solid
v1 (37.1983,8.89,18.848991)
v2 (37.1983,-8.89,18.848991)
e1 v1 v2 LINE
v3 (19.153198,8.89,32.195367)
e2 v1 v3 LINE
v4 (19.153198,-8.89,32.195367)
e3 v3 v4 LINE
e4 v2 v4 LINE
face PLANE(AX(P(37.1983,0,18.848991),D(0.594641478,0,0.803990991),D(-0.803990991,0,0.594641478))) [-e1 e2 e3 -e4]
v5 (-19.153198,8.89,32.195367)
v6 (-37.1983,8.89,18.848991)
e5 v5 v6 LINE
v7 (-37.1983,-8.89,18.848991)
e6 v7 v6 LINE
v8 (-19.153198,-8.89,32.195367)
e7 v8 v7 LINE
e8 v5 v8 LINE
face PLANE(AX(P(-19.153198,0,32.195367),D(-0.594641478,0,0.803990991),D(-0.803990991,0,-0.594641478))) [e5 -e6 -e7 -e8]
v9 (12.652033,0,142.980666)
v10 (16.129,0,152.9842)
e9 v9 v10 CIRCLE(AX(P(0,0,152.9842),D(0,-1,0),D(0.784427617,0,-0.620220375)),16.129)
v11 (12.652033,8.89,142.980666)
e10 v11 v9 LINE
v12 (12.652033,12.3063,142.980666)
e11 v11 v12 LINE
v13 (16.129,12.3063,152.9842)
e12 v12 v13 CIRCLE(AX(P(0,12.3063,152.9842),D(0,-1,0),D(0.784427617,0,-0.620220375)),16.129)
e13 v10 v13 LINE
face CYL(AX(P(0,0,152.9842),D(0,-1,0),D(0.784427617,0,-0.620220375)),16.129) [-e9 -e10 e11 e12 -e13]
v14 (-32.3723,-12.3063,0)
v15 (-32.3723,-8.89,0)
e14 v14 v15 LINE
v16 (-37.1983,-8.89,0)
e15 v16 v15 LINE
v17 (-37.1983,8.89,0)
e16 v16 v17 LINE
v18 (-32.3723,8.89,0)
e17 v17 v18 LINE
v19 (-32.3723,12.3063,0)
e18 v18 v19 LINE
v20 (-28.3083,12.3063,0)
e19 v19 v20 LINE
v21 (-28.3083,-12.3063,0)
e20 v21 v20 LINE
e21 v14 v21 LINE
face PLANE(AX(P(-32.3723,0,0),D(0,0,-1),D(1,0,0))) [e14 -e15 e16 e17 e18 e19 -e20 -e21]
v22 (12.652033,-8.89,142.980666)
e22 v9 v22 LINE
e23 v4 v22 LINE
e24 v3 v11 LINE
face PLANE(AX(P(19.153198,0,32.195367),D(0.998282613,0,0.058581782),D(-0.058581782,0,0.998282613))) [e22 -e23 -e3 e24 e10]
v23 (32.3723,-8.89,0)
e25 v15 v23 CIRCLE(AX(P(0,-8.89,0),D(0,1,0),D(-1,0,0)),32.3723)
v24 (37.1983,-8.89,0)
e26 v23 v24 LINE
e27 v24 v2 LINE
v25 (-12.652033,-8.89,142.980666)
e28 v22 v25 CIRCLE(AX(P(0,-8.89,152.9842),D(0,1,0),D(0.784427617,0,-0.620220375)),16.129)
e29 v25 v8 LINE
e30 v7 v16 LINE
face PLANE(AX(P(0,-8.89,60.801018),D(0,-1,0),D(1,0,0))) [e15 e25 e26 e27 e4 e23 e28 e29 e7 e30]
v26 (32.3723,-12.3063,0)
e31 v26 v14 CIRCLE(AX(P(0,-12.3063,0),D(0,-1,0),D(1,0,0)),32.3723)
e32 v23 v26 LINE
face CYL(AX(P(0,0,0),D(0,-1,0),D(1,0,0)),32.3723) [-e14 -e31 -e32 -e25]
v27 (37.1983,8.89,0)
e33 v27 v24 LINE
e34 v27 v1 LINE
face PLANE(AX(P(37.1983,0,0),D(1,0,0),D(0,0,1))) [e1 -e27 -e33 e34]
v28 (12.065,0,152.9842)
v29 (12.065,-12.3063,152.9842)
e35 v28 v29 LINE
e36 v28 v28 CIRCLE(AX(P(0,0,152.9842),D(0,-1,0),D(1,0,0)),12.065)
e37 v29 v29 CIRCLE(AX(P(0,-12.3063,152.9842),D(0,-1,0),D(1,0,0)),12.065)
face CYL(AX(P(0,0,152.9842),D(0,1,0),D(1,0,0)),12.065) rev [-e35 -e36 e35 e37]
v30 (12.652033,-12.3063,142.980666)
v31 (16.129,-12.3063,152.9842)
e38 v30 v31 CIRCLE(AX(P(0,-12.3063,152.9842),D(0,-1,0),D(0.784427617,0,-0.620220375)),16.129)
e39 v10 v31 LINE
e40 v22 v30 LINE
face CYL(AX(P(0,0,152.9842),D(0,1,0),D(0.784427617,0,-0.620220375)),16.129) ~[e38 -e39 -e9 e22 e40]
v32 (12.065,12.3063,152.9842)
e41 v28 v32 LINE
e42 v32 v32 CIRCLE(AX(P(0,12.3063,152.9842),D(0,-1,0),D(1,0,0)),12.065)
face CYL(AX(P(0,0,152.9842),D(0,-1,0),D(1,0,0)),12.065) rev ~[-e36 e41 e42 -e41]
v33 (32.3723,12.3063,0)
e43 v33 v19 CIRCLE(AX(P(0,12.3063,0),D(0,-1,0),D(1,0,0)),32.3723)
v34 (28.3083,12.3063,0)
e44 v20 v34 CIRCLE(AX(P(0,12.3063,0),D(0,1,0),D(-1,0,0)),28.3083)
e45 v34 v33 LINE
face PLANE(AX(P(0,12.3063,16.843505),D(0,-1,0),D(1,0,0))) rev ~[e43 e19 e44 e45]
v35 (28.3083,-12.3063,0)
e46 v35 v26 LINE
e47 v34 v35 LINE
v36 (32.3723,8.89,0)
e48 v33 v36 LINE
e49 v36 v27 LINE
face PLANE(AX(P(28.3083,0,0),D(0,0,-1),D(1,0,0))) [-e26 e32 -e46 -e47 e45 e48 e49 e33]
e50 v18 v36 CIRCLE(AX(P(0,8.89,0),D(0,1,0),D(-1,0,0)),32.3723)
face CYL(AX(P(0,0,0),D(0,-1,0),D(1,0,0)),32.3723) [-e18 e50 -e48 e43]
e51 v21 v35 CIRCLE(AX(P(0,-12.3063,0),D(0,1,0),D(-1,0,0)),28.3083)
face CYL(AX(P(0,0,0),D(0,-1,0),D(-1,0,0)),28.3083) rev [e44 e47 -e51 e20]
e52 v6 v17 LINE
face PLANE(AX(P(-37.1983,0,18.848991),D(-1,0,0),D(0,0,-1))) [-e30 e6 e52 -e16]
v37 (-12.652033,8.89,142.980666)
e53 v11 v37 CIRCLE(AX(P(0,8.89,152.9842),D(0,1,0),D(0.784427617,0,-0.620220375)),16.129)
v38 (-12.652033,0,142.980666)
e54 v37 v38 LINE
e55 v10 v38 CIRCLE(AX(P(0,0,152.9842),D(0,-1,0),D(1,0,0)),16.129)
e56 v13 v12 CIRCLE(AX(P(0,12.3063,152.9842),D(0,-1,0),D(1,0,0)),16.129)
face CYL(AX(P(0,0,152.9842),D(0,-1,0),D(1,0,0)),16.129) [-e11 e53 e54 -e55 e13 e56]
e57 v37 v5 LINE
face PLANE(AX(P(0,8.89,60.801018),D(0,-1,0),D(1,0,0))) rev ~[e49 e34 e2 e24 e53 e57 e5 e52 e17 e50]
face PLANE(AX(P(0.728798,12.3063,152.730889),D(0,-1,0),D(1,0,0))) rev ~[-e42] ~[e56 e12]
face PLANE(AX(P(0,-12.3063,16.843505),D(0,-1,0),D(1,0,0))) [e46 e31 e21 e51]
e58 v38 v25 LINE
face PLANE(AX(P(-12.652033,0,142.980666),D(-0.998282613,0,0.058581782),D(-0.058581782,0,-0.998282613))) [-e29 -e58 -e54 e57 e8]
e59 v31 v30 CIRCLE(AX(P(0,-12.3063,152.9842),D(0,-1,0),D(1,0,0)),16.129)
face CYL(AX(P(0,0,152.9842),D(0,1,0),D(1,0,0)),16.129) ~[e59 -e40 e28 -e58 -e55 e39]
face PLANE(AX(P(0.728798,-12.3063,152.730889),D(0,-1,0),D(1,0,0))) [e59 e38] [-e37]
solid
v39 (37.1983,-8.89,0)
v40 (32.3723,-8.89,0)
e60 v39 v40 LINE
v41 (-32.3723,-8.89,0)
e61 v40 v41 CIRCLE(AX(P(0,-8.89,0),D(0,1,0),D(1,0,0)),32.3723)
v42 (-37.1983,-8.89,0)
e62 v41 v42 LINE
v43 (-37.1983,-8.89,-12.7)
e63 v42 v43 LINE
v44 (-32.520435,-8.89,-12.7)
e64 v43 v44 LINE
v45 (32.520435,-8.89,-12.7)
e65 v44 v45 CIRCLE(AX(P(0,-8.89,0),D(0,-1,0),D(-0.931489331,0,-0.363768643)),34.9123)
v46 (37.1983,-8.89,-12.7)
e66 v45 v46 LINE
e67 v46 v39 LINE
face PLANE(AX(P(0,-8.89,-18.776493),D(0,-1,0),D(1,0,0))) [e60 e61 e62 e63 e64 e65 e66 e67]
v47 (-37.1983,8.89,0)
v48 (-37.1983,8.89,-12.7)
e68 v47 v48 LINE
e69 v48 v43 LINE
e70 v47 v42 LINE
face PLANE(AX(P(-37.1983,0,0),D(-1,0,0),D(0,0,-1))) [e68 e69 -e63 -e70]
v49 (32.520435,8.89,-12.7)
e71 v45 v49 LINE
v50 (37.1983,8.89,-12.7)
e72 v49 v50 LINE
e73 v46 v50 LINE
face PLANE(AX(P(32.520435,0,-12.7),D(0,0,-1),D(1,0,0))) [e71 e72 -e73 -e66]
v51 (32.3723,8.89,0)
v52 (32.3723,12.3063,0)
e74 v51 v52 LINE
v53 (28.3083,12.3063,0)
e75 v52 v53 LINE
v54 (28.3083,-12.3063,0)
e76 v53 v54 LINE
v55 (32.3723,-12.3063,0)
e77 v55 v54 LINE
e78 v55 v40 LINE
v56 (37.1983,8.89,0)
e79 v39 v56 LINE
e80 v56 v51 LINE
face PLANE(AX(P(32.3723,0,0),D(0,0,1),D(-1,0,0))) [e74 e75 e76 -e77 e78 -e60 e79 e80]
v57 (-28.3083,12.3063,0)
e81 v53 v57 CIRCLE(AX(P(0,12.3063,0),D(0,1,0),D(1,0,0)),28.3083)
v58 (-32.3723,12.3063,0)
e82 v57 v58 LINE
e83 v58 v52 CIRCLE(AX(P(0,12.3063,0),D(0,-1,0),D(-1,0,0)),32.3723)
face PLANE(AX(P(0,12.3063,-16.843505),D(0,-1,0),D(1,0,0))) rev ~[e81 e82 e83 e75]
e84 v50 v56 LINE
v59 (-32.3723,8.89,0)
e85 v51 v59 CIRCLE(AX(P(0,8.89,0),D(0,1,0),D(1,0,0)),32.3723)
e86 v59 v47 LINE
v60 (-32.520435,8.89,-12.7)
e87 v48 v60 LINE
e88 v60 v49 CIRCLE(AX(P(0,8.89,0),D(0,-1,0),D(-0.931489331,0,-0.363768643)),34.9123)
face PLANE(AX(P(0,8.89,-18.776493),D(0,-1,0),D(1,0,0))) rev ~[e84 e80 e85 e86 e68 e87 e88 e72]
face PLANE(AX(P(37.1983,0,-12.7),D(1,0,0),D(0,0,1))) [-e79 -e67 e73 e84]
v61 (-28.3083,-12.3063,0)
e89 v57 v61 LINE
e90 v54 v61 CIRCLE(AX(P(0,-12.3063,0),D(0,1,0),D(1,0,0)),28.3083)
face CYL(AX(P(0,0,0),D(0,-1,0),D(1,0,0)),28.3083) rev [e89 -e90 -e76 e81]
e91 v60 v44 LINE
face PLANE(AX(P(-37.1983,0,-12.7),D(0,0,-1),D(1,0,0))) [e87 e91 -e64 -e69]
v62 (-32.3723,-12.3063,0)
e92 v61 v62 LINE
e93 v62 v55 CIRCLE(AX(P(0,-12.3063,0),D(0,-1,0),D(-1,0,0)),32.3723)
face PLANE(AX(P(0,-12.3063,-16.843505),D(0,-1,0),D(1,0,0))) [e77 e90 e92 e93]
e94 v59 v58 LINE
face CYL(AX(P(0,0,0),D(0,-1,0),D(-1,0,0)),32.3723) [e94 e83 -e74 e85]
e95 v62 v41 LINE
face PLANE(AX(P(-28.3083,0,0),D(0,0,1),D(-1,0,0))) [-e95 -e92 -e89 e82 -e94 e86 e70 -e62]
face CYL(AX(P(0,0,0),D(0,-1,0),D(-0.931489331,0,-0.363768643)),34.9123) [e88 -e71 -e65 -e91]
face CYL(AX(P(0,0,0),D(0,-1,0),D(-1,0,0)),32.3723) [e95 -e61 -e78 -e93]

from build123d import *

# Parameters (mm, degrees)
F1_DEPTH = 12.3063
F2_DEPTH = 8.89
F0_R     = 12.065
F3_DEPTH = 12.3063
F4_DEPTH = 12.3063
F5_DEPTH = 8.89


with BuildPart() as f1:
    # F0 (on Front) → F1 (new body, symmetric)
    with BuildSketch(Plane.XZ):
        with BuildLine():
            ThreePointArc((-28.3083, 0), (0, 28.3083), (28.3083, 0))
            Line((28.3083, 0), (32.3723, 0))
            ThreePointArc((32.3723, 0), (0, 32.3723), (-32.3723, 0))
            Line((-32.3723, 0), (-28.3083, 0))
        make_face()
    extrude(amount=F1_DEPTH, both=True)

    # F0 (on Front) → F2 (join, symmetric)
    with BuildSketch(Plane.XZ):
        with BuildLine():
            ThreePointArc((-32.3723, 0), (0, 32.3723), (32.3723, 0))
            Line((32.3723, 0), (37.1983, 0))
            Line((37.1983, 0), (37.1983, 18.8489910215))
            Line((37.1983, 18.8489910215), (19.1531982273, 32.195366919))
            Line((19.1531982273, 32.195366919), (12.6520330329, 142.9806655679))
            ThreePointArc((12.6520330329, 142.9806655679), (0, 136.8552), (-12.6520330329, 142.9806655679))
            Line((-12.6520330329, 142.9806655679), (-19.1531982273, 32.195366919))
            Line((-19.1531982273, 32.195366919), (-37.1983, 18.8489910215))
            Line((-37.1983, 18.8489910215), (-37.1983, 0))
            Line((-37.1983, 0), (-32.3723, 0))
        make_face()
    extrude(amount=F2_DEPTH, both=True)

    # F0 (on Front) → F3 (join, symmetric)
    with BuildSketch(Plane.XZ):
        with BuildLine():
            ThreePointArc((-12.6520330329, 142.9806655679), (0, 136.8552), (12.6520330329, 142.9806655679))
            ThreePointArc((12.6520330329, 142.9806655679), (15.2349808301, 147.6889190721), (16.129, 152.9842))
            ThreePointArc((16.129, 152.9842), (-5.2952809279, 168.2191808301), (-12.6520330329, 142.9806655679))
        make_face()
        with Locations((0, 152.9842)):
            Circle(F0_R, mode=Mode.SUBTRACT)
    extrude(amount=F3_DEPTH, both=True)


with BuildPart() as f4:
    # F0 (on Front) → F4 (new body, symmetric)
    with BuildSketch(Plane.XZ):
        with BuildLine():
            Line((32.3723, 0), (28.3083, 0))
            ThreePointArc((28.3083, 0), (0, -28.3083), (-28.3083, 0))
            Line((-28.3083, 0), (-32.3723, 0))
            ThreePointArc((-32.3723, 0), (0, -32.3723), (32.3723, 0))
        make_face()
    extrude(amount=F4_DEPTH, both=True)

    # F0 (on Front) → F5 (join, symmetric)
    with BuildSketch(Plane.XZ):
        with BuildLine():
            Line((37.1983, 0), (32.3723, 0))
            ThreePointArc((32.3723, 0), (0, -32.3723), (-32.3723, 0))
            Line((-32.3723, 0), (-37.1983, 0))
            Line((-37.1983, 0), (-37.1983, -12.7))
            Line((-37.1983, -12.7), (-32.52043498, -12.7))
            ThreePointArc((-32.52043498, -12.7), (0, -34.9123), (32.52043498, -12.7))
            Line((32.52043498, -12.7), (37.1983, -12.7))
            Line((37.1983, -12.7), (37.1983, 0))
        make_face()
    extrude(amount=F5_DEPTH, both=True)


solid = Compound([f1.part, f4.part])
